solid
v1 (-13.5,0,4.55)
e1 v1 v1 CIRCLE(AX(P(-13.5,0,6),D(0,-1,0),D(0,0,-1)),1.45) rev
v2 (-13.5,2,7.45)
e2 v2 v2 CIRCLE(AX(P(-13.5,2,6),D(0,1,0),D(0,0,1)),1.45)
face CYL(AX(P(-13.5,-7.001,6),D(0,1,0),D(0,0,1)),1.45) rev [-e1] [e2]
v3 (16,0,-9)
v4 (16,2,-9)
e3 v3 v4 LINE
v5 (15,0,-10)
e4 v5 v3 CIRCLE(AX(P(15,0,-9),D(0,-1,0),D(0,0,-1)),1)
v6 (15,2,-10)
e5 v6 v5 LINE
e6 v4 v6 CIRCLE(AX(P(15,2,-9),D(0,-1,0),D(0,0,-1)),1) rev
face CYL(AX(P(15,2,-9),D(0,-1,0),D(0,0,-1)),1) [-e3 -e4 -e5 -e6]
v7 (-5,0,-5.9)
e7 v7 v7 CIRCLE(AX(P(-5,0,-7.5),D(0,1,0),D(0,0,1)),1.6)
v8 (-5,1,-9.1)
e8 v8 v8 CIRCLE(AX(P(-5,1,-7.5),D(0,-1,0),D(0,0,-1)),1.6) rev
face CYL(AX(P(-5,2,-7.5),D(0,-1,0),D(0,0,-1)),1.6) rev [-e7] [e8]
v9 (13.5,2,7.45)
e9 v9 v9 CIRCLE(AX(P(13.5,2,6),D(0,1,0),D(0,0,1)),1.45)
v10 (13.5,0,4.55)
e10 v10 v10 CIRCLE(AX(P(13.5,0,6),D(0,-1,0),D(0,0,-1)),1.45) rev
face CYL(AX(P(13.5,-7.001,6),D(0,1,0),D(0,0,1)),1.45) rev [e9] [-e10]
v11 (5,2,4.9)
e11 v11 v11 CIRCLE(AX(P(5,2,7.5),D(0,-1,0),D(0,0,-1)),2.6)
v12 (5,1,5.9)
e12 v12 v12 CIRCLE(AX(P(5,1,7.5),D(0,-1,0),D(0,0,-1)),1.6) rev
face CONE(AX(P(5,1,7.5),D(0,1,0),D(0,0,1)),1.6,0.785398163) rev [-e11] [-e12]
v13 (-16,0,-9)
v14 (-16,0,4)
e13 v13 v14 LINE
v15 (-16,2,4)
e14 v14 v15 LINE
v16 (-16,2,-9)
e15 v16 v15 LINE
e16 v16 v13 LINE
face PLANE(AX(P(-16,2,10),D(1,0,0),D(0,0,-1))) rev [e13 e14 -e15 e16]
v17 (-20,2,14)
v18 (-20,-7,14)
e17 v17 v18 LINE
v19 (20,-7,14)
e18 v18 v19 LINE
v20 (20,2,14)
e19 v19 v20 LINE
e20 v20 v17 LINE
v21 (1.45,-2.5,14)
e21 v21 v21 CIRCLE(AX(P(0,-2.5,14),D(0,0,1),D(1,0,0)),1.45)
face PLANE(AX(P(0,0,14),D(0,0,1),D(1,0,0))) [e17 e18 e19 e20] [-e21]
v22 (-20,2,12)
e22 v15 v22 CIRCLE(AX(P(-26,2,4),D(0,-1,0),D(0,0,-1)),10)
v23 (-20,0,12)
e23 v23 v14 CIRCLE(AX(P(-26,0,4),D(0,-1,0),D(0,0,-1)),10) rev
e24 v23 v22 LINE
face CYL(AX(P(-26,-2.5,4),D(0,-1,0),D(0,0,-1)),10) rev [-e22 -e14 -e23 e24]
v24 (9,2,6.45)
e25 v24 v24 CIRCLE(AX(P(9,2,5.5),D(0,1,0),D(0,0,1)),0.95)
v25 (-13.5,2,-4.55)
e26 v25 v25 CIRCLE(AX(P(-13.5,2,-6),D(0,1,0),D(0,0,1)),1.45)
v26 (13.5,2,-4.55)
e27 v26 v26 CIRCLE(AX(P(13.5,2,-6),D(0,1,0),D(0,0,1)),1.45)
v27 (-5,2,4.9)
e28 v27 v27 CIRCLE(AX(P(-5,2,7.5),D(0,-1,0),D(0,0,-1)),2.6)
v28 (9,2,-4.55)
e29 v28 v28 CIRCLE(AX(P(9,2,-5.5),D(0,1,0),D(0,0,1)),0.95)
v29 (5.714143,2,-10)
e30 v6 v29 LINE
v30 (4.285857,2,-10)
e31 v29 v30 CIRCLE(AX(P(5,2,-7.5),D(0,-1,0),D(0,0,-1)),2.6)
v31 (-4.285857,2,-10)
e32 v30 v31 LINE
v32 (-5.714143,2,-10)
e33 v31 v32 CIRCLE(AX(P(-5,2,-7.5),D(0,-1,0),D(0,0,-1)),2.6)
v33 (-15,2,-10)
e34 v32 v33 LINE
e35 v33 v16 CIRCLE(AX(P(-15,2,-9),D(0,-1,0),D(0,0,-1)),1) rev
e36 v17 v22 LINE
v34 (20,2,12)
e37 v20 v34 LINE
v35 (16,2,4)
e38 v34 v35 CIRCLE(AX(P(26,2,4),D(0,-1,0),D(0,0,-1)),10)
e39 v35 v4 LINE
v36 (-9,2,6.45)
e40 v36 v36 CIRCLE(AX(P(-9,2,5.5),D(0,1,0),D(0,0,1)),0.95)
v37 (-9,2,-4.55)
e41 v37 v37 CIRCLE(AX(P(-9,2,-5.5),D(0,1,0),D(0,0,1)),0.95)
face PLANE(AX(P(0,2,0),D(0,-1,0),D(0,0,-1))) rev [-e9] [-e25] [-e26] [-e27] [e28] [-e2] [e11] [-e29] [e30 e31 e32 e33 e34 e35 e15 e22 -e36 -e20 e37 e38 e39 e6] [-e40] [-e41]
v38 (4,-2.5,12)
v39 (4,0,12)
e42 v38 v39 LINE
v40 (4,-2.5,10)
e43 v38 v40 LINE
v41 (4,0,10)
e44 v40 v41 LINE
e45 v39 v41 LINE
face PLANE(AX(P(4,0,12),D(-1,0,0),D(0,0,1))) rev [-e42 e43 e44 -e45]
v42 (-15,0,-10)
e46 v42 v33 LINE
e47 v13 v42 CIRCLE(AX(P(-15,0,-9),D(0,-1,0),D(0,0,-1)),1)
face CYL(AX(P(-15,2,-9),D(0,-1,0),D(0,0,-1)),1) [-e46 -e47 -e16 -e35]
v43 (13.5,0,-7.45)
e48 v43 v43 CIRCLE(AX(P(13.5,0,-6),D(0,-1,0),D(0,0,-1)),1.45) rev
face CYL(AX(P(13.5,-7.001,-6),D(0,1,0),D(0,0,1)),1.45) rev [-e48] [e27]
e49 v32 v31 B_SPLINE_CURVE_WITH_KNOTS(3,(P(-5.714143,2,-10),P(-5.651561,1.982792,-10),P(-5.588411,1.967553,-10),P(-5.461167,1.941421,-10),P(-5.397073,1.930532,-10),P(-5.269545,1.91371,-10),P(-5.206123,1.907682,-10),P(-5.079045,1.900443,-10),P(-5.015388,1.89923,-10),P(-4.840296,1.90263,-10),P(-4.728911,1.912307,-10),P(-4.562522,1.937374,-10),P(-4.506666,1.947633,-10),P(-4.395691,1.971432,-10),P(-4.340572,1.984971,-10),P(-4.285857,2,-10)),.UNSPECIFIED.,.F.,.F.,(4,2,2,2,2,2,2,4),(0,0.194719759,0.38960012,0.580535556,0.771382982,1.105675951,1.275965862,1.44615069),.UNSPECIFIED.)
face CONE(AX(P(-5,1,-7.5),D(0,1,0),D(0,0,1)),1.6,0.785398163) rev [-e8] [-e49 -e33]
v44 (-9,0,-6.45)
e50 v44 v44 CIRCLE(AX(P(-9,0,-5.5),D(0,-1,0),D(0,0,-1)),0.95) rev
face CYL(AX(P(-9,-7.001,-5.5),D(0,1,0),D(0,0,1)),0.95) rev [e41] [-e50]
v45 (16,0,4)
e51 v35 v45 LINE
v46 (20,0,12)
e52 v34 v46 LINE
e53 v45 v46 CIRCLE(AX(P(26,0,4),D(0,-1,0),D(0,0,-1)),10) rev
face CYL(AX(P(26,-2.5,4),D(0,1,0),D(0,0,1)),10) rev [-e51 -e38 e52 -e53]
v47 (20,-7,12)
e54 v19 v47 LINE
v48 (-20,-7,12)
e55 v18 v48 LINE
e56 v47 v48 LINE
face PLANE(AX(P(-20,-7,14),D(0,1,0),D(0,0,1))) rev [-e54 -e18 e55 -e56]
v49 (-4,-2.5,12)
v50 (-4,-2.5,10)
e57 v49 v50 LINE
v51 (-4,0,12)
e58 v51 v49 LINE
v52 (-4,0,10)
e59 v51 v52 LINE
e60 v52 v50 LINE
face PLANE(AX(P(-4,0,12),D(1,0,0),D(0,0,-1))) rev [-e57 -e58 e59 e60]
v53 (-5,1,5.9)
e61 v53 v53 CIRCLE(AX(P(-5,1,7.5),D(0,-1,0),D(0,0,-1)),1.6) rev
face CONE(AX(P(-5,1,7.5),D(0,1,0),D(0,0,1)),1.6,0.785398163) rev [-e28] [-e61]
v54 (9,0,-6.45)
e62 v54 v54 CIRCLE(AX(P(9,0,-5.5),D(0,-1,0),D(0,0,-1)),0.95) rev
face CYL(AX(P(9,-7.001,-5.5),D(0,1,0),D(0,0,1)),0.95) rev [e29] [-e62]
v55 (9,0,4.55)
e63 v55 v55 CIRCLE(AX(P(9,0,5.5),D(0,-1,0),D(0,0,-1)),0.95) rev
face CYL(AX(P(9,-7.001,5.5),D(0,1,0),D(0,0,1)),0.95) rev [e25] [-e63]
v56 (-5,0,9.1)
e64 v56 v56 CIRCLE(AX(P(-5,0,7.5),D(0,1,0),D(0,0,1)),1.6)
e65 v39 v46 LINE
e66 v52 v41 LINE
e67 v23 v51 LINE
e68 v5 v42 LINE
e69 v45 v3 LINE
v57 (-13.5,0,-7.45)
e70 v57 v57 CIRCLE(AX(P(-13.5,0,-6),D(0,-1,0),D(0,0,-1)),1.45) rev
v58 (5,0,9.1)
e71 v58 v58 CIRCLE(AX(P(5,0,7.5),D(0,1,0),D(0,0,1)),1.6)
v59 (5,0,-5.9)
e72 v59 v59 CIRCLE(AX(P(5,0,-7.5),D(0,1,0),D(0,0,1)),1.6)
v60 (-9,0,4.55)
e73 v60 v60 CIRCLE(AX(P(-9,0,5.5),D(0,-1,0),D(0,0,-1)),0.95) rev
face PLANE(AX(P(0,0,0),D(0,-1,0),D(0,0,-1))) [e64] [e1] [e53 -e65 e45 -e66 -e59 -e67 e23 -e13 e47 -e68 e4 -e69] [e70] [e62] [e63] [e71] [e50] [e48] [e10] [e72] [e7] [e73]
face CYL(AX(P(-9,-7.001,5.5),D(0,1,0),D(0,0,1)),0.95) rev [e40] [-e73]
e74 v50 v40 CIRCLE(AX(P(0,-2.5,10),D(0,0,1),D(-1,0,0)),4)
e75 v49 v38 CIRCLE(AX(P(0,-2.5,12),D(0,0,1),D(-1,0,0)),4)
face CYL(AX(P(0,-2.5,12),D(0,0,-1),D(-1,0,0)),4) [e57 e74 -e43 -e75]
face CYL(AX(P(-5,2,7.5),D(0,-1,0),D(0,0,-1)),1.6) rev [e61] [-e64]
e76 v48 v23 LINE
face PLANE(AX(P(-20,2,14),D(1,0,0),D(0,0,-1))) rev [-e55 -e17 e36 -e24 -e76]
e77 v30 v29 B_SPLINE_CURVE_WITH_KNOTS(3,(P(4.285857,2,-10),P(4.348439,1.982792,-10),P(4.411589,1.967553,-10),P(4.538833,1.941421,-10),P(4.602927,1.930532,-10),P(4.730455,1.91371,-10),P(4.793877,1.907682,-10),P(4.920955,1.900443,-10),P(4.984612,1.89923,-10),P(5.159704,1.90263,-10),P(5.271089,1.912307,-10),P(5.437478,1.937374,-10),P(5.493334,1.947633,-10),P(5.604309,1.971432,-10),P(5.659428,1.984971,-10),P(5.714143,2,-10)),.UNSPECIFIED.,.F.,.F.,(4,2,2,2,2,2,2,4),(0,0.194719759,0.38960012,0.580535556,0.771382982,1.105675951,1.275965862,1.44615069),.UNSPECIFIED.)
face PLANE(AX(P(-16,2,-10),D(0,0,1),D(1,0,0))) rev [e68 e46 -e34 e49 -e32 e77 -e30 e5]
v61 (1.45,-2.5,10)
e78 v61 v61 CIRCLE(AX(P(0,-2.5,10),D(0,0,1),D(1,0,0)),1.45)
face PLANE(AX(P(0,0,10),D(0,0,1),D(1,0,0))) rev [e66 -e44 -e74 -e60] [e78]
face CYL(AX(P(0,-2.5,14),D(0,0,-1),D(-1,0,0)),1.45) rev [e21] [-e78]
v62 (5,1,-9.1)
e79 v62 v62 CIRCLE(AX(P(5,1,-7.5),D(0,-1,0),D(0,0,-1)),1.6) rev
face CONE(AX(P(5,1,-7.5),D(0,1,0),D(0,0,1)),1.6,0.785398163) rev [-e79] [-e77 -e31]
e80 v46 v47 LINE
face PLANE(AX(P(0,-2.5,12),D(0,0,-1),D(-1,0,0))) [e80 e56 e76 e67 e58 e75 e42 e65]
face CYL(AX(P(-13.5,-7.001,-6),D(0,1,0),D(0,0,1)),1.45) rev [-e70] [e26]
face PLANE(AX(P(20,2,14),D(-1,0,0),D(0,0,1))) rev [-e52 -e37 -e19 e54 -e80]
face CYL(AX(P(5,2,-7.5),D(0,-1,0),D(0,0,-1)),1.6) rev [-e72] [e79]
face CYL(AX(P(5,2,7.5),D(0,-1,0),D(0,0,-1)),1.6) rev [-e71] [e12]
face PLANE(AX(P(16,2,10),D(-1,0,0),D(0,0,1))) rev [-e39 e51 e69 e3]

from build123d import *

# Parameters (mm, degrees)
SKETCH1_W           = 32
SKETCH1_H           = 20
SKETCH1_R           = 1.6
BOSS_EXTRUDE1_DEPTH = 2
SKETCH3_W           = 40
SKETCH3_H           = 9
SKETCH3_R           = 1.45
BOSS_EXTRUDE2_DEPTH = 4
CUT_EXTRUDE1_DEPTH  = 2
FILLET1_R           = 10
CHAMFER1_SIZE       = 1
CUT_EXTRUDE2_REACH  = 28.019
SKETCH12_R          = 1.45
SKETCH12_R_2        = 0.95
FILLET2_R           = 1


with BuildPart() as part:
    # Sketch1 → Boss-Extrude1 (new body)
    with BuildSketch(Plane(origin=(0, 0, 0), x_dir=(1, 0, 0), z_dir=(0, 1, 0))):
        Rectangle(SKETCH1_W, SKETCH1_H)
        with Locations(Location((-5, 7.5, 0), (0, 0, 270))):
            Circle(SKETCH1_R, mode=Mode.SUBTRACT)
        with Locations(Location((5, 7.5, 0), (0, 0, 270))):
            Circle(SKETCH1_R, mode=Mode.SUBTRACT)
        with Locations(Location((-5, -7.5, 0), (0, 0, 270))):
            Circle(SKETCH1_R, mode=Mode.SUBTRACT)
        with Locations(Location((5, -7.5, 0), (0, 0, 270))):
            Circle(SKETCH1_R, mode=Mode.SUBTRACT)
    extrude(amount=BOSS_EXTRUDE1_DEPTH)

    # Sketch3 → Boss-Extrude2 (add)
    with BuildSketch(Plane.XY.offset(10)):
        with Locations((0, -2.5)):
            Rectangle(SKETCH3_W, SKETCH3_H)
        with Locations((0, -2.5)):
            Circle(SKETCH3_R, mode=Mode.SUBTRACT)
    extrude(amount=BOSS_EXTRUDE2_DEPTH)

    # Sketch4 → Cut-Extrude1 (cut)
    with BuildSketch(Plane(origin=(0, 0, 10), x_dir=(-1, 0, 0), z_dir=(0, 0, -1))):
        with BuildLine():
            Line((-16, 2), (-20, 2))
            Line((-20, 2), (-20, -7))
            Line((-20, -7), (20, -7))
            Line((20, -7), (20, 2))
            Line((20, 2), (16, 2))
            Line((16, 2), (16, 0))
            Line((16, 0), (4, 0))
            Line((4, 0), (4, -2.5))
            ThreePointArc((4, -2.5), (0, -6.5), (-4, -2.5))
            Line((-4, -2.5), (-4, 0))
            Line((-4, 0), (-16, 0))
            Line((-16, 0), (-16, 2))
        make_face()
    extrude(amount=-CUT_EXTRUDE1_DEPTH, mode=Mode.SUBTRACT)

    # Fillet1
    # the kernel refuses this fillet: 10 mm, written as the material it adds along each edge
    with BuildSketch(Plane(origin=(16, 0, 12), x_dir=(0, 0, -1), z_dir=(0, 1, 0)), Plane(origin=(-16, 2, 12), x_dir=(0, 0, -1), z_dir=(0, -1, 0))) as fillet1_piece_1:
        with BuildLine():
            CenterArc((8, -10), FILLET1_R, 90, 53.130102354)
            Line((0, -4), (-0.16, -3.88))
            ThreePointArc((-0.16, -3.88), (-0.2, -2), (-0.2, 0))
            Line((-0.2, 0), (0, 0.2))
            Line((0, 0.2), (8, 0.2))
            Line((8, 0.2), (8, 0))
        make_face()
    extrude(amount=2)

    # Chamfer1
    # the kernel refuses this chamfer: 1 mm, written as the material it takes off along each edge
    with BuildSketch(Plane(origin=(-5, 2, -7.5), x_dir=(0, 0, 1), z_dir=(-1, 0, 0))) as chamfer1_piece_1:
        Polygon((1.6 + CHAMFER1_SIZE, 0), (1.6, -CHAMFER1_SIZE), (1.6, 0), align=None)
    revolve(axis=Axis((-5, 2, -7.5), (0, 1, 0)), mode=Mode.SUBTRACT)
    with BuildSketch(Plane(origin=(5, 2, -7.5), x_dir=(0, 0, 1), z_dir=(-1, 0, 0))) as chamfer1_piece_2:
        Polygon((1.6 + CHAMFER1_SIZE, 0), (1.6, -CHAMFER1_SIZE), (1.6, 0), align=None)
    revolve(axis=Axis((5, 2, -7.5), (0, 1, 0)), mode=Mode.SUBTRACT)
    with BuildSketch(Plane(origin=(-5, 2, 7.5), x_dir=(0, 0, 1), z_dir=(-1, 0, 0))) as chamfer1_piece_3:
        Polygon((1.6 + CHAMFER1_SIZE, 0), (1.6, -CHAMFER1_SIZE), (1.6, 0), align=None)
    revolve(axis=Axis((-5, 2, 7.5), (0, 1, 0)), mode=Mode.SUBTRACT)
    with BuildSketch(Plane(origin=(5, 2, 7.5), x_dir=(0, 0, 1), z_dir=(-1, 0, 0))) as chamfer1_piece_4:
        Polygon((1.6 + CHAMFER1_SIZE, 0), (1.6, -CHAMFER1_SIZE), (1.6, 0), align=None)
    revolve(axis=Axis((5, 2, 7.5), (0, 1, 0)), mode=Mode.SUBTRACT)

    # Sketch12 → Cut-Extrude2 (cut, up to next)
    with BuildSketch(Plane(origin=(0, 2, 0), x_dir=(1, 0, 0), z_dir=(0, 1, 0)), mode=Mode.PRIVATE) as cut_extrude2_sk1:
        with Locations(Location((-13.5, 6, 0), (0, 0, 270))):
            Circle(SKETCH12_R)
    cut_extrude2_tool1 = extrude(cut_extrude2_sk1.sketch, amount=-CUT_EXTRUDE2_REACH, mode=Mode.PRIVATE) & part.part
    # Sketch12 → Cut-Extrude2 (cut, up to next)
    with BuildSketch(Plane(origin=(0, 2, 0), x_dir=(1, 0, 0), z_dir=(0, 1, 0)), mode=Mode.PRIVATE) as cut_extrude2_sk2:
        with Locations(Location((-13.5, -6, 0), (0, 0, 270))):
            Circle(SKETCH12_R)
    cut_extrude2_tool2 = extrude(cut_extrude2_sk2.sketch, amount=-CUT_EXTRUDE2_REACH, mode=Mode.PRIVATE) & part.part
    # Sketch12 → Cut-Extrude2 (cut, up to next)
    with BuildSketch(Plane(origin=(0, 2, 0), x_dir=(1, 0, 0), z_dir=(0, 1, 0)), mode=Mode.PRIVATE) as cut_extrude2_sk3:
        with Locations(Location((13.5, -6, 0), (0, 0, 270))):
            Circle(SKETCH12_R)
    cut_extrude2_tool3 = extrude(cut_extrude2_sk3.sketch, amount=-CUT_EXTRUDE2_REACH, mode=Mode.PRIVATE) & part.part
    # Sketch12 → Cut-Extrude2 (cut, up to next)
    with BuildSketch(Plane(origin=(0, 2, 0), x_dir=(1, 0, 0), z_dir=(0, 1, 0)), mode=Mode.PRIVATE) as cut_extrude2_sk4:
        with Locations(Location((13.5, 6, 0), (0, 0, 270))):
            Circle(SKETCH12_R)
    cut_extrude2_tool4 = extrude(cut_extrude2_sk4.sketch, amount=-CUT_EXTRUDE2_REACH, mode=Mode.PRIVATE) & part.part
    # Sketch12 → Cut-Extrude2 (cut, up to next)
    with BuildSketch(Plane(origin=(0, 2, 0), x_dir=(1, 0, 0), z_dir=(0, 1, 0)), mode=Mode.PRIVATE) as cut_extrude2_sk5:
        with Locations(Location((-9, 5.5, 0), (0, 0, 270))):
            Circle(SKETCH12_R_2)
    cut_extrude2_tool5 = extrude(cut_extrude2_sk5.sketch, amount=-CUT_EXTRUDE2_REACH, mode=Mode.PRIVATE) & part.part
    # Sketch12 → Cut-Extrude2 (cut, up to next)
    with BuildSketch(Plane(origin=(0, 2, 0), x_dir=(1, 0, 0), z_dir=(0, 1, 0)), mode=Mode.PRIVATE) as cut_extrude2_sk6:
        with Locations(Location((9, 5.5, 0), (0, 0, 270))):
            Circle(SKETCH12_R_2)
    cut_extrude2_tool6 = extrude(cut_extrude2_sk6.sketch, amount=-CUT_EXTRUDE2_REACH, mode=Mode.PRIVATE) & part.part
    # Sketch12 → Cut-Extrude2 (cut, up to next)
    with BuildSketch(Plane(origin=(0, 2, 0), x_dir=(1, 0, 0), z_dir=(0, 1, 0)), mode=Mode.PRIVATE) as cut_extrude2_sk7:
        with Locations(Location((9, -5.5, 0), (0, 0, 270))):
            Circle(SKETCH12_R_2)
    cut_extrude2_tool7 = extrude(cut_extrude2_sk7.sketch, amount=-CUT_EXTRUDE2_REACH, mode=Mode.PRIVATE) & part.part
    # Sketch12 → Cut-Extrude2 (cut, up to next)
    with BuildSketch(Plane(origin=(0, 2, 0), x_dir=(1, 0, 0), z_dir=(0, 1, 0)), mode=Mode.PRIVATE) as cut_extrude2_sk8:
        with Locations(Location((-9, -5.5, 0), (0, 0, 270))):
            Circle(SKETCH12_R_2)
    cut_extrude2_tool8 = extrude(cut_extrude2_sk8.sketch, amount=-CUT_EXTRUDE2_REACH, mode=Mode.PRIVATE) & part.part
    add(cut_extrude2_tool1.solids().sort_by_distance((-13.5, 2, -6))[0], mode=Mode.SUBTRACT)
    add(cut_extrude2_tool2.solids().sort_by_distance((-13.5, 2, 6))[0], mode=Mode.SUBTRACT)
    add(cut_extrude2_tool3.solids().sort_by_distance((13.5, 2, 6))[0], mode=Mode.SUBTRACT)
    add(cut_extrude2_tool4.solids().sort_by_distance((13.5, 2, -6))[0], mode=Mode.SUBTRACT)
    add(cut_extrude2_tool5.solids().sort_by_distance((-9, 2, -5.5))[0], mode=Mode.SUBTRACT)
    add(cut_extrude2_tool6.solids().sort_by_distance((9, 2, -5.5))[0], mode=Mode.SUBTRACT)
    add(cut_extrude2_tool7.solids().sort_by_distance((9, 2, 5.5))[0], mode=Mode.SUBTRACT)
    add(cut_extrude2_tool8.solids().sort_by_distance((-9, 2, 5.5))[0], mode=Mode.SUBTRACT)

    # Fillet2
    fillet2_edges = [part.edges().sort_by_distance(p)[0] for p in [
        (-16, 1, -10),
        (16, 1, -10),
    ]]
    fillet(fillet2_edges, radius=FILLET2_R)


solid = part.part
